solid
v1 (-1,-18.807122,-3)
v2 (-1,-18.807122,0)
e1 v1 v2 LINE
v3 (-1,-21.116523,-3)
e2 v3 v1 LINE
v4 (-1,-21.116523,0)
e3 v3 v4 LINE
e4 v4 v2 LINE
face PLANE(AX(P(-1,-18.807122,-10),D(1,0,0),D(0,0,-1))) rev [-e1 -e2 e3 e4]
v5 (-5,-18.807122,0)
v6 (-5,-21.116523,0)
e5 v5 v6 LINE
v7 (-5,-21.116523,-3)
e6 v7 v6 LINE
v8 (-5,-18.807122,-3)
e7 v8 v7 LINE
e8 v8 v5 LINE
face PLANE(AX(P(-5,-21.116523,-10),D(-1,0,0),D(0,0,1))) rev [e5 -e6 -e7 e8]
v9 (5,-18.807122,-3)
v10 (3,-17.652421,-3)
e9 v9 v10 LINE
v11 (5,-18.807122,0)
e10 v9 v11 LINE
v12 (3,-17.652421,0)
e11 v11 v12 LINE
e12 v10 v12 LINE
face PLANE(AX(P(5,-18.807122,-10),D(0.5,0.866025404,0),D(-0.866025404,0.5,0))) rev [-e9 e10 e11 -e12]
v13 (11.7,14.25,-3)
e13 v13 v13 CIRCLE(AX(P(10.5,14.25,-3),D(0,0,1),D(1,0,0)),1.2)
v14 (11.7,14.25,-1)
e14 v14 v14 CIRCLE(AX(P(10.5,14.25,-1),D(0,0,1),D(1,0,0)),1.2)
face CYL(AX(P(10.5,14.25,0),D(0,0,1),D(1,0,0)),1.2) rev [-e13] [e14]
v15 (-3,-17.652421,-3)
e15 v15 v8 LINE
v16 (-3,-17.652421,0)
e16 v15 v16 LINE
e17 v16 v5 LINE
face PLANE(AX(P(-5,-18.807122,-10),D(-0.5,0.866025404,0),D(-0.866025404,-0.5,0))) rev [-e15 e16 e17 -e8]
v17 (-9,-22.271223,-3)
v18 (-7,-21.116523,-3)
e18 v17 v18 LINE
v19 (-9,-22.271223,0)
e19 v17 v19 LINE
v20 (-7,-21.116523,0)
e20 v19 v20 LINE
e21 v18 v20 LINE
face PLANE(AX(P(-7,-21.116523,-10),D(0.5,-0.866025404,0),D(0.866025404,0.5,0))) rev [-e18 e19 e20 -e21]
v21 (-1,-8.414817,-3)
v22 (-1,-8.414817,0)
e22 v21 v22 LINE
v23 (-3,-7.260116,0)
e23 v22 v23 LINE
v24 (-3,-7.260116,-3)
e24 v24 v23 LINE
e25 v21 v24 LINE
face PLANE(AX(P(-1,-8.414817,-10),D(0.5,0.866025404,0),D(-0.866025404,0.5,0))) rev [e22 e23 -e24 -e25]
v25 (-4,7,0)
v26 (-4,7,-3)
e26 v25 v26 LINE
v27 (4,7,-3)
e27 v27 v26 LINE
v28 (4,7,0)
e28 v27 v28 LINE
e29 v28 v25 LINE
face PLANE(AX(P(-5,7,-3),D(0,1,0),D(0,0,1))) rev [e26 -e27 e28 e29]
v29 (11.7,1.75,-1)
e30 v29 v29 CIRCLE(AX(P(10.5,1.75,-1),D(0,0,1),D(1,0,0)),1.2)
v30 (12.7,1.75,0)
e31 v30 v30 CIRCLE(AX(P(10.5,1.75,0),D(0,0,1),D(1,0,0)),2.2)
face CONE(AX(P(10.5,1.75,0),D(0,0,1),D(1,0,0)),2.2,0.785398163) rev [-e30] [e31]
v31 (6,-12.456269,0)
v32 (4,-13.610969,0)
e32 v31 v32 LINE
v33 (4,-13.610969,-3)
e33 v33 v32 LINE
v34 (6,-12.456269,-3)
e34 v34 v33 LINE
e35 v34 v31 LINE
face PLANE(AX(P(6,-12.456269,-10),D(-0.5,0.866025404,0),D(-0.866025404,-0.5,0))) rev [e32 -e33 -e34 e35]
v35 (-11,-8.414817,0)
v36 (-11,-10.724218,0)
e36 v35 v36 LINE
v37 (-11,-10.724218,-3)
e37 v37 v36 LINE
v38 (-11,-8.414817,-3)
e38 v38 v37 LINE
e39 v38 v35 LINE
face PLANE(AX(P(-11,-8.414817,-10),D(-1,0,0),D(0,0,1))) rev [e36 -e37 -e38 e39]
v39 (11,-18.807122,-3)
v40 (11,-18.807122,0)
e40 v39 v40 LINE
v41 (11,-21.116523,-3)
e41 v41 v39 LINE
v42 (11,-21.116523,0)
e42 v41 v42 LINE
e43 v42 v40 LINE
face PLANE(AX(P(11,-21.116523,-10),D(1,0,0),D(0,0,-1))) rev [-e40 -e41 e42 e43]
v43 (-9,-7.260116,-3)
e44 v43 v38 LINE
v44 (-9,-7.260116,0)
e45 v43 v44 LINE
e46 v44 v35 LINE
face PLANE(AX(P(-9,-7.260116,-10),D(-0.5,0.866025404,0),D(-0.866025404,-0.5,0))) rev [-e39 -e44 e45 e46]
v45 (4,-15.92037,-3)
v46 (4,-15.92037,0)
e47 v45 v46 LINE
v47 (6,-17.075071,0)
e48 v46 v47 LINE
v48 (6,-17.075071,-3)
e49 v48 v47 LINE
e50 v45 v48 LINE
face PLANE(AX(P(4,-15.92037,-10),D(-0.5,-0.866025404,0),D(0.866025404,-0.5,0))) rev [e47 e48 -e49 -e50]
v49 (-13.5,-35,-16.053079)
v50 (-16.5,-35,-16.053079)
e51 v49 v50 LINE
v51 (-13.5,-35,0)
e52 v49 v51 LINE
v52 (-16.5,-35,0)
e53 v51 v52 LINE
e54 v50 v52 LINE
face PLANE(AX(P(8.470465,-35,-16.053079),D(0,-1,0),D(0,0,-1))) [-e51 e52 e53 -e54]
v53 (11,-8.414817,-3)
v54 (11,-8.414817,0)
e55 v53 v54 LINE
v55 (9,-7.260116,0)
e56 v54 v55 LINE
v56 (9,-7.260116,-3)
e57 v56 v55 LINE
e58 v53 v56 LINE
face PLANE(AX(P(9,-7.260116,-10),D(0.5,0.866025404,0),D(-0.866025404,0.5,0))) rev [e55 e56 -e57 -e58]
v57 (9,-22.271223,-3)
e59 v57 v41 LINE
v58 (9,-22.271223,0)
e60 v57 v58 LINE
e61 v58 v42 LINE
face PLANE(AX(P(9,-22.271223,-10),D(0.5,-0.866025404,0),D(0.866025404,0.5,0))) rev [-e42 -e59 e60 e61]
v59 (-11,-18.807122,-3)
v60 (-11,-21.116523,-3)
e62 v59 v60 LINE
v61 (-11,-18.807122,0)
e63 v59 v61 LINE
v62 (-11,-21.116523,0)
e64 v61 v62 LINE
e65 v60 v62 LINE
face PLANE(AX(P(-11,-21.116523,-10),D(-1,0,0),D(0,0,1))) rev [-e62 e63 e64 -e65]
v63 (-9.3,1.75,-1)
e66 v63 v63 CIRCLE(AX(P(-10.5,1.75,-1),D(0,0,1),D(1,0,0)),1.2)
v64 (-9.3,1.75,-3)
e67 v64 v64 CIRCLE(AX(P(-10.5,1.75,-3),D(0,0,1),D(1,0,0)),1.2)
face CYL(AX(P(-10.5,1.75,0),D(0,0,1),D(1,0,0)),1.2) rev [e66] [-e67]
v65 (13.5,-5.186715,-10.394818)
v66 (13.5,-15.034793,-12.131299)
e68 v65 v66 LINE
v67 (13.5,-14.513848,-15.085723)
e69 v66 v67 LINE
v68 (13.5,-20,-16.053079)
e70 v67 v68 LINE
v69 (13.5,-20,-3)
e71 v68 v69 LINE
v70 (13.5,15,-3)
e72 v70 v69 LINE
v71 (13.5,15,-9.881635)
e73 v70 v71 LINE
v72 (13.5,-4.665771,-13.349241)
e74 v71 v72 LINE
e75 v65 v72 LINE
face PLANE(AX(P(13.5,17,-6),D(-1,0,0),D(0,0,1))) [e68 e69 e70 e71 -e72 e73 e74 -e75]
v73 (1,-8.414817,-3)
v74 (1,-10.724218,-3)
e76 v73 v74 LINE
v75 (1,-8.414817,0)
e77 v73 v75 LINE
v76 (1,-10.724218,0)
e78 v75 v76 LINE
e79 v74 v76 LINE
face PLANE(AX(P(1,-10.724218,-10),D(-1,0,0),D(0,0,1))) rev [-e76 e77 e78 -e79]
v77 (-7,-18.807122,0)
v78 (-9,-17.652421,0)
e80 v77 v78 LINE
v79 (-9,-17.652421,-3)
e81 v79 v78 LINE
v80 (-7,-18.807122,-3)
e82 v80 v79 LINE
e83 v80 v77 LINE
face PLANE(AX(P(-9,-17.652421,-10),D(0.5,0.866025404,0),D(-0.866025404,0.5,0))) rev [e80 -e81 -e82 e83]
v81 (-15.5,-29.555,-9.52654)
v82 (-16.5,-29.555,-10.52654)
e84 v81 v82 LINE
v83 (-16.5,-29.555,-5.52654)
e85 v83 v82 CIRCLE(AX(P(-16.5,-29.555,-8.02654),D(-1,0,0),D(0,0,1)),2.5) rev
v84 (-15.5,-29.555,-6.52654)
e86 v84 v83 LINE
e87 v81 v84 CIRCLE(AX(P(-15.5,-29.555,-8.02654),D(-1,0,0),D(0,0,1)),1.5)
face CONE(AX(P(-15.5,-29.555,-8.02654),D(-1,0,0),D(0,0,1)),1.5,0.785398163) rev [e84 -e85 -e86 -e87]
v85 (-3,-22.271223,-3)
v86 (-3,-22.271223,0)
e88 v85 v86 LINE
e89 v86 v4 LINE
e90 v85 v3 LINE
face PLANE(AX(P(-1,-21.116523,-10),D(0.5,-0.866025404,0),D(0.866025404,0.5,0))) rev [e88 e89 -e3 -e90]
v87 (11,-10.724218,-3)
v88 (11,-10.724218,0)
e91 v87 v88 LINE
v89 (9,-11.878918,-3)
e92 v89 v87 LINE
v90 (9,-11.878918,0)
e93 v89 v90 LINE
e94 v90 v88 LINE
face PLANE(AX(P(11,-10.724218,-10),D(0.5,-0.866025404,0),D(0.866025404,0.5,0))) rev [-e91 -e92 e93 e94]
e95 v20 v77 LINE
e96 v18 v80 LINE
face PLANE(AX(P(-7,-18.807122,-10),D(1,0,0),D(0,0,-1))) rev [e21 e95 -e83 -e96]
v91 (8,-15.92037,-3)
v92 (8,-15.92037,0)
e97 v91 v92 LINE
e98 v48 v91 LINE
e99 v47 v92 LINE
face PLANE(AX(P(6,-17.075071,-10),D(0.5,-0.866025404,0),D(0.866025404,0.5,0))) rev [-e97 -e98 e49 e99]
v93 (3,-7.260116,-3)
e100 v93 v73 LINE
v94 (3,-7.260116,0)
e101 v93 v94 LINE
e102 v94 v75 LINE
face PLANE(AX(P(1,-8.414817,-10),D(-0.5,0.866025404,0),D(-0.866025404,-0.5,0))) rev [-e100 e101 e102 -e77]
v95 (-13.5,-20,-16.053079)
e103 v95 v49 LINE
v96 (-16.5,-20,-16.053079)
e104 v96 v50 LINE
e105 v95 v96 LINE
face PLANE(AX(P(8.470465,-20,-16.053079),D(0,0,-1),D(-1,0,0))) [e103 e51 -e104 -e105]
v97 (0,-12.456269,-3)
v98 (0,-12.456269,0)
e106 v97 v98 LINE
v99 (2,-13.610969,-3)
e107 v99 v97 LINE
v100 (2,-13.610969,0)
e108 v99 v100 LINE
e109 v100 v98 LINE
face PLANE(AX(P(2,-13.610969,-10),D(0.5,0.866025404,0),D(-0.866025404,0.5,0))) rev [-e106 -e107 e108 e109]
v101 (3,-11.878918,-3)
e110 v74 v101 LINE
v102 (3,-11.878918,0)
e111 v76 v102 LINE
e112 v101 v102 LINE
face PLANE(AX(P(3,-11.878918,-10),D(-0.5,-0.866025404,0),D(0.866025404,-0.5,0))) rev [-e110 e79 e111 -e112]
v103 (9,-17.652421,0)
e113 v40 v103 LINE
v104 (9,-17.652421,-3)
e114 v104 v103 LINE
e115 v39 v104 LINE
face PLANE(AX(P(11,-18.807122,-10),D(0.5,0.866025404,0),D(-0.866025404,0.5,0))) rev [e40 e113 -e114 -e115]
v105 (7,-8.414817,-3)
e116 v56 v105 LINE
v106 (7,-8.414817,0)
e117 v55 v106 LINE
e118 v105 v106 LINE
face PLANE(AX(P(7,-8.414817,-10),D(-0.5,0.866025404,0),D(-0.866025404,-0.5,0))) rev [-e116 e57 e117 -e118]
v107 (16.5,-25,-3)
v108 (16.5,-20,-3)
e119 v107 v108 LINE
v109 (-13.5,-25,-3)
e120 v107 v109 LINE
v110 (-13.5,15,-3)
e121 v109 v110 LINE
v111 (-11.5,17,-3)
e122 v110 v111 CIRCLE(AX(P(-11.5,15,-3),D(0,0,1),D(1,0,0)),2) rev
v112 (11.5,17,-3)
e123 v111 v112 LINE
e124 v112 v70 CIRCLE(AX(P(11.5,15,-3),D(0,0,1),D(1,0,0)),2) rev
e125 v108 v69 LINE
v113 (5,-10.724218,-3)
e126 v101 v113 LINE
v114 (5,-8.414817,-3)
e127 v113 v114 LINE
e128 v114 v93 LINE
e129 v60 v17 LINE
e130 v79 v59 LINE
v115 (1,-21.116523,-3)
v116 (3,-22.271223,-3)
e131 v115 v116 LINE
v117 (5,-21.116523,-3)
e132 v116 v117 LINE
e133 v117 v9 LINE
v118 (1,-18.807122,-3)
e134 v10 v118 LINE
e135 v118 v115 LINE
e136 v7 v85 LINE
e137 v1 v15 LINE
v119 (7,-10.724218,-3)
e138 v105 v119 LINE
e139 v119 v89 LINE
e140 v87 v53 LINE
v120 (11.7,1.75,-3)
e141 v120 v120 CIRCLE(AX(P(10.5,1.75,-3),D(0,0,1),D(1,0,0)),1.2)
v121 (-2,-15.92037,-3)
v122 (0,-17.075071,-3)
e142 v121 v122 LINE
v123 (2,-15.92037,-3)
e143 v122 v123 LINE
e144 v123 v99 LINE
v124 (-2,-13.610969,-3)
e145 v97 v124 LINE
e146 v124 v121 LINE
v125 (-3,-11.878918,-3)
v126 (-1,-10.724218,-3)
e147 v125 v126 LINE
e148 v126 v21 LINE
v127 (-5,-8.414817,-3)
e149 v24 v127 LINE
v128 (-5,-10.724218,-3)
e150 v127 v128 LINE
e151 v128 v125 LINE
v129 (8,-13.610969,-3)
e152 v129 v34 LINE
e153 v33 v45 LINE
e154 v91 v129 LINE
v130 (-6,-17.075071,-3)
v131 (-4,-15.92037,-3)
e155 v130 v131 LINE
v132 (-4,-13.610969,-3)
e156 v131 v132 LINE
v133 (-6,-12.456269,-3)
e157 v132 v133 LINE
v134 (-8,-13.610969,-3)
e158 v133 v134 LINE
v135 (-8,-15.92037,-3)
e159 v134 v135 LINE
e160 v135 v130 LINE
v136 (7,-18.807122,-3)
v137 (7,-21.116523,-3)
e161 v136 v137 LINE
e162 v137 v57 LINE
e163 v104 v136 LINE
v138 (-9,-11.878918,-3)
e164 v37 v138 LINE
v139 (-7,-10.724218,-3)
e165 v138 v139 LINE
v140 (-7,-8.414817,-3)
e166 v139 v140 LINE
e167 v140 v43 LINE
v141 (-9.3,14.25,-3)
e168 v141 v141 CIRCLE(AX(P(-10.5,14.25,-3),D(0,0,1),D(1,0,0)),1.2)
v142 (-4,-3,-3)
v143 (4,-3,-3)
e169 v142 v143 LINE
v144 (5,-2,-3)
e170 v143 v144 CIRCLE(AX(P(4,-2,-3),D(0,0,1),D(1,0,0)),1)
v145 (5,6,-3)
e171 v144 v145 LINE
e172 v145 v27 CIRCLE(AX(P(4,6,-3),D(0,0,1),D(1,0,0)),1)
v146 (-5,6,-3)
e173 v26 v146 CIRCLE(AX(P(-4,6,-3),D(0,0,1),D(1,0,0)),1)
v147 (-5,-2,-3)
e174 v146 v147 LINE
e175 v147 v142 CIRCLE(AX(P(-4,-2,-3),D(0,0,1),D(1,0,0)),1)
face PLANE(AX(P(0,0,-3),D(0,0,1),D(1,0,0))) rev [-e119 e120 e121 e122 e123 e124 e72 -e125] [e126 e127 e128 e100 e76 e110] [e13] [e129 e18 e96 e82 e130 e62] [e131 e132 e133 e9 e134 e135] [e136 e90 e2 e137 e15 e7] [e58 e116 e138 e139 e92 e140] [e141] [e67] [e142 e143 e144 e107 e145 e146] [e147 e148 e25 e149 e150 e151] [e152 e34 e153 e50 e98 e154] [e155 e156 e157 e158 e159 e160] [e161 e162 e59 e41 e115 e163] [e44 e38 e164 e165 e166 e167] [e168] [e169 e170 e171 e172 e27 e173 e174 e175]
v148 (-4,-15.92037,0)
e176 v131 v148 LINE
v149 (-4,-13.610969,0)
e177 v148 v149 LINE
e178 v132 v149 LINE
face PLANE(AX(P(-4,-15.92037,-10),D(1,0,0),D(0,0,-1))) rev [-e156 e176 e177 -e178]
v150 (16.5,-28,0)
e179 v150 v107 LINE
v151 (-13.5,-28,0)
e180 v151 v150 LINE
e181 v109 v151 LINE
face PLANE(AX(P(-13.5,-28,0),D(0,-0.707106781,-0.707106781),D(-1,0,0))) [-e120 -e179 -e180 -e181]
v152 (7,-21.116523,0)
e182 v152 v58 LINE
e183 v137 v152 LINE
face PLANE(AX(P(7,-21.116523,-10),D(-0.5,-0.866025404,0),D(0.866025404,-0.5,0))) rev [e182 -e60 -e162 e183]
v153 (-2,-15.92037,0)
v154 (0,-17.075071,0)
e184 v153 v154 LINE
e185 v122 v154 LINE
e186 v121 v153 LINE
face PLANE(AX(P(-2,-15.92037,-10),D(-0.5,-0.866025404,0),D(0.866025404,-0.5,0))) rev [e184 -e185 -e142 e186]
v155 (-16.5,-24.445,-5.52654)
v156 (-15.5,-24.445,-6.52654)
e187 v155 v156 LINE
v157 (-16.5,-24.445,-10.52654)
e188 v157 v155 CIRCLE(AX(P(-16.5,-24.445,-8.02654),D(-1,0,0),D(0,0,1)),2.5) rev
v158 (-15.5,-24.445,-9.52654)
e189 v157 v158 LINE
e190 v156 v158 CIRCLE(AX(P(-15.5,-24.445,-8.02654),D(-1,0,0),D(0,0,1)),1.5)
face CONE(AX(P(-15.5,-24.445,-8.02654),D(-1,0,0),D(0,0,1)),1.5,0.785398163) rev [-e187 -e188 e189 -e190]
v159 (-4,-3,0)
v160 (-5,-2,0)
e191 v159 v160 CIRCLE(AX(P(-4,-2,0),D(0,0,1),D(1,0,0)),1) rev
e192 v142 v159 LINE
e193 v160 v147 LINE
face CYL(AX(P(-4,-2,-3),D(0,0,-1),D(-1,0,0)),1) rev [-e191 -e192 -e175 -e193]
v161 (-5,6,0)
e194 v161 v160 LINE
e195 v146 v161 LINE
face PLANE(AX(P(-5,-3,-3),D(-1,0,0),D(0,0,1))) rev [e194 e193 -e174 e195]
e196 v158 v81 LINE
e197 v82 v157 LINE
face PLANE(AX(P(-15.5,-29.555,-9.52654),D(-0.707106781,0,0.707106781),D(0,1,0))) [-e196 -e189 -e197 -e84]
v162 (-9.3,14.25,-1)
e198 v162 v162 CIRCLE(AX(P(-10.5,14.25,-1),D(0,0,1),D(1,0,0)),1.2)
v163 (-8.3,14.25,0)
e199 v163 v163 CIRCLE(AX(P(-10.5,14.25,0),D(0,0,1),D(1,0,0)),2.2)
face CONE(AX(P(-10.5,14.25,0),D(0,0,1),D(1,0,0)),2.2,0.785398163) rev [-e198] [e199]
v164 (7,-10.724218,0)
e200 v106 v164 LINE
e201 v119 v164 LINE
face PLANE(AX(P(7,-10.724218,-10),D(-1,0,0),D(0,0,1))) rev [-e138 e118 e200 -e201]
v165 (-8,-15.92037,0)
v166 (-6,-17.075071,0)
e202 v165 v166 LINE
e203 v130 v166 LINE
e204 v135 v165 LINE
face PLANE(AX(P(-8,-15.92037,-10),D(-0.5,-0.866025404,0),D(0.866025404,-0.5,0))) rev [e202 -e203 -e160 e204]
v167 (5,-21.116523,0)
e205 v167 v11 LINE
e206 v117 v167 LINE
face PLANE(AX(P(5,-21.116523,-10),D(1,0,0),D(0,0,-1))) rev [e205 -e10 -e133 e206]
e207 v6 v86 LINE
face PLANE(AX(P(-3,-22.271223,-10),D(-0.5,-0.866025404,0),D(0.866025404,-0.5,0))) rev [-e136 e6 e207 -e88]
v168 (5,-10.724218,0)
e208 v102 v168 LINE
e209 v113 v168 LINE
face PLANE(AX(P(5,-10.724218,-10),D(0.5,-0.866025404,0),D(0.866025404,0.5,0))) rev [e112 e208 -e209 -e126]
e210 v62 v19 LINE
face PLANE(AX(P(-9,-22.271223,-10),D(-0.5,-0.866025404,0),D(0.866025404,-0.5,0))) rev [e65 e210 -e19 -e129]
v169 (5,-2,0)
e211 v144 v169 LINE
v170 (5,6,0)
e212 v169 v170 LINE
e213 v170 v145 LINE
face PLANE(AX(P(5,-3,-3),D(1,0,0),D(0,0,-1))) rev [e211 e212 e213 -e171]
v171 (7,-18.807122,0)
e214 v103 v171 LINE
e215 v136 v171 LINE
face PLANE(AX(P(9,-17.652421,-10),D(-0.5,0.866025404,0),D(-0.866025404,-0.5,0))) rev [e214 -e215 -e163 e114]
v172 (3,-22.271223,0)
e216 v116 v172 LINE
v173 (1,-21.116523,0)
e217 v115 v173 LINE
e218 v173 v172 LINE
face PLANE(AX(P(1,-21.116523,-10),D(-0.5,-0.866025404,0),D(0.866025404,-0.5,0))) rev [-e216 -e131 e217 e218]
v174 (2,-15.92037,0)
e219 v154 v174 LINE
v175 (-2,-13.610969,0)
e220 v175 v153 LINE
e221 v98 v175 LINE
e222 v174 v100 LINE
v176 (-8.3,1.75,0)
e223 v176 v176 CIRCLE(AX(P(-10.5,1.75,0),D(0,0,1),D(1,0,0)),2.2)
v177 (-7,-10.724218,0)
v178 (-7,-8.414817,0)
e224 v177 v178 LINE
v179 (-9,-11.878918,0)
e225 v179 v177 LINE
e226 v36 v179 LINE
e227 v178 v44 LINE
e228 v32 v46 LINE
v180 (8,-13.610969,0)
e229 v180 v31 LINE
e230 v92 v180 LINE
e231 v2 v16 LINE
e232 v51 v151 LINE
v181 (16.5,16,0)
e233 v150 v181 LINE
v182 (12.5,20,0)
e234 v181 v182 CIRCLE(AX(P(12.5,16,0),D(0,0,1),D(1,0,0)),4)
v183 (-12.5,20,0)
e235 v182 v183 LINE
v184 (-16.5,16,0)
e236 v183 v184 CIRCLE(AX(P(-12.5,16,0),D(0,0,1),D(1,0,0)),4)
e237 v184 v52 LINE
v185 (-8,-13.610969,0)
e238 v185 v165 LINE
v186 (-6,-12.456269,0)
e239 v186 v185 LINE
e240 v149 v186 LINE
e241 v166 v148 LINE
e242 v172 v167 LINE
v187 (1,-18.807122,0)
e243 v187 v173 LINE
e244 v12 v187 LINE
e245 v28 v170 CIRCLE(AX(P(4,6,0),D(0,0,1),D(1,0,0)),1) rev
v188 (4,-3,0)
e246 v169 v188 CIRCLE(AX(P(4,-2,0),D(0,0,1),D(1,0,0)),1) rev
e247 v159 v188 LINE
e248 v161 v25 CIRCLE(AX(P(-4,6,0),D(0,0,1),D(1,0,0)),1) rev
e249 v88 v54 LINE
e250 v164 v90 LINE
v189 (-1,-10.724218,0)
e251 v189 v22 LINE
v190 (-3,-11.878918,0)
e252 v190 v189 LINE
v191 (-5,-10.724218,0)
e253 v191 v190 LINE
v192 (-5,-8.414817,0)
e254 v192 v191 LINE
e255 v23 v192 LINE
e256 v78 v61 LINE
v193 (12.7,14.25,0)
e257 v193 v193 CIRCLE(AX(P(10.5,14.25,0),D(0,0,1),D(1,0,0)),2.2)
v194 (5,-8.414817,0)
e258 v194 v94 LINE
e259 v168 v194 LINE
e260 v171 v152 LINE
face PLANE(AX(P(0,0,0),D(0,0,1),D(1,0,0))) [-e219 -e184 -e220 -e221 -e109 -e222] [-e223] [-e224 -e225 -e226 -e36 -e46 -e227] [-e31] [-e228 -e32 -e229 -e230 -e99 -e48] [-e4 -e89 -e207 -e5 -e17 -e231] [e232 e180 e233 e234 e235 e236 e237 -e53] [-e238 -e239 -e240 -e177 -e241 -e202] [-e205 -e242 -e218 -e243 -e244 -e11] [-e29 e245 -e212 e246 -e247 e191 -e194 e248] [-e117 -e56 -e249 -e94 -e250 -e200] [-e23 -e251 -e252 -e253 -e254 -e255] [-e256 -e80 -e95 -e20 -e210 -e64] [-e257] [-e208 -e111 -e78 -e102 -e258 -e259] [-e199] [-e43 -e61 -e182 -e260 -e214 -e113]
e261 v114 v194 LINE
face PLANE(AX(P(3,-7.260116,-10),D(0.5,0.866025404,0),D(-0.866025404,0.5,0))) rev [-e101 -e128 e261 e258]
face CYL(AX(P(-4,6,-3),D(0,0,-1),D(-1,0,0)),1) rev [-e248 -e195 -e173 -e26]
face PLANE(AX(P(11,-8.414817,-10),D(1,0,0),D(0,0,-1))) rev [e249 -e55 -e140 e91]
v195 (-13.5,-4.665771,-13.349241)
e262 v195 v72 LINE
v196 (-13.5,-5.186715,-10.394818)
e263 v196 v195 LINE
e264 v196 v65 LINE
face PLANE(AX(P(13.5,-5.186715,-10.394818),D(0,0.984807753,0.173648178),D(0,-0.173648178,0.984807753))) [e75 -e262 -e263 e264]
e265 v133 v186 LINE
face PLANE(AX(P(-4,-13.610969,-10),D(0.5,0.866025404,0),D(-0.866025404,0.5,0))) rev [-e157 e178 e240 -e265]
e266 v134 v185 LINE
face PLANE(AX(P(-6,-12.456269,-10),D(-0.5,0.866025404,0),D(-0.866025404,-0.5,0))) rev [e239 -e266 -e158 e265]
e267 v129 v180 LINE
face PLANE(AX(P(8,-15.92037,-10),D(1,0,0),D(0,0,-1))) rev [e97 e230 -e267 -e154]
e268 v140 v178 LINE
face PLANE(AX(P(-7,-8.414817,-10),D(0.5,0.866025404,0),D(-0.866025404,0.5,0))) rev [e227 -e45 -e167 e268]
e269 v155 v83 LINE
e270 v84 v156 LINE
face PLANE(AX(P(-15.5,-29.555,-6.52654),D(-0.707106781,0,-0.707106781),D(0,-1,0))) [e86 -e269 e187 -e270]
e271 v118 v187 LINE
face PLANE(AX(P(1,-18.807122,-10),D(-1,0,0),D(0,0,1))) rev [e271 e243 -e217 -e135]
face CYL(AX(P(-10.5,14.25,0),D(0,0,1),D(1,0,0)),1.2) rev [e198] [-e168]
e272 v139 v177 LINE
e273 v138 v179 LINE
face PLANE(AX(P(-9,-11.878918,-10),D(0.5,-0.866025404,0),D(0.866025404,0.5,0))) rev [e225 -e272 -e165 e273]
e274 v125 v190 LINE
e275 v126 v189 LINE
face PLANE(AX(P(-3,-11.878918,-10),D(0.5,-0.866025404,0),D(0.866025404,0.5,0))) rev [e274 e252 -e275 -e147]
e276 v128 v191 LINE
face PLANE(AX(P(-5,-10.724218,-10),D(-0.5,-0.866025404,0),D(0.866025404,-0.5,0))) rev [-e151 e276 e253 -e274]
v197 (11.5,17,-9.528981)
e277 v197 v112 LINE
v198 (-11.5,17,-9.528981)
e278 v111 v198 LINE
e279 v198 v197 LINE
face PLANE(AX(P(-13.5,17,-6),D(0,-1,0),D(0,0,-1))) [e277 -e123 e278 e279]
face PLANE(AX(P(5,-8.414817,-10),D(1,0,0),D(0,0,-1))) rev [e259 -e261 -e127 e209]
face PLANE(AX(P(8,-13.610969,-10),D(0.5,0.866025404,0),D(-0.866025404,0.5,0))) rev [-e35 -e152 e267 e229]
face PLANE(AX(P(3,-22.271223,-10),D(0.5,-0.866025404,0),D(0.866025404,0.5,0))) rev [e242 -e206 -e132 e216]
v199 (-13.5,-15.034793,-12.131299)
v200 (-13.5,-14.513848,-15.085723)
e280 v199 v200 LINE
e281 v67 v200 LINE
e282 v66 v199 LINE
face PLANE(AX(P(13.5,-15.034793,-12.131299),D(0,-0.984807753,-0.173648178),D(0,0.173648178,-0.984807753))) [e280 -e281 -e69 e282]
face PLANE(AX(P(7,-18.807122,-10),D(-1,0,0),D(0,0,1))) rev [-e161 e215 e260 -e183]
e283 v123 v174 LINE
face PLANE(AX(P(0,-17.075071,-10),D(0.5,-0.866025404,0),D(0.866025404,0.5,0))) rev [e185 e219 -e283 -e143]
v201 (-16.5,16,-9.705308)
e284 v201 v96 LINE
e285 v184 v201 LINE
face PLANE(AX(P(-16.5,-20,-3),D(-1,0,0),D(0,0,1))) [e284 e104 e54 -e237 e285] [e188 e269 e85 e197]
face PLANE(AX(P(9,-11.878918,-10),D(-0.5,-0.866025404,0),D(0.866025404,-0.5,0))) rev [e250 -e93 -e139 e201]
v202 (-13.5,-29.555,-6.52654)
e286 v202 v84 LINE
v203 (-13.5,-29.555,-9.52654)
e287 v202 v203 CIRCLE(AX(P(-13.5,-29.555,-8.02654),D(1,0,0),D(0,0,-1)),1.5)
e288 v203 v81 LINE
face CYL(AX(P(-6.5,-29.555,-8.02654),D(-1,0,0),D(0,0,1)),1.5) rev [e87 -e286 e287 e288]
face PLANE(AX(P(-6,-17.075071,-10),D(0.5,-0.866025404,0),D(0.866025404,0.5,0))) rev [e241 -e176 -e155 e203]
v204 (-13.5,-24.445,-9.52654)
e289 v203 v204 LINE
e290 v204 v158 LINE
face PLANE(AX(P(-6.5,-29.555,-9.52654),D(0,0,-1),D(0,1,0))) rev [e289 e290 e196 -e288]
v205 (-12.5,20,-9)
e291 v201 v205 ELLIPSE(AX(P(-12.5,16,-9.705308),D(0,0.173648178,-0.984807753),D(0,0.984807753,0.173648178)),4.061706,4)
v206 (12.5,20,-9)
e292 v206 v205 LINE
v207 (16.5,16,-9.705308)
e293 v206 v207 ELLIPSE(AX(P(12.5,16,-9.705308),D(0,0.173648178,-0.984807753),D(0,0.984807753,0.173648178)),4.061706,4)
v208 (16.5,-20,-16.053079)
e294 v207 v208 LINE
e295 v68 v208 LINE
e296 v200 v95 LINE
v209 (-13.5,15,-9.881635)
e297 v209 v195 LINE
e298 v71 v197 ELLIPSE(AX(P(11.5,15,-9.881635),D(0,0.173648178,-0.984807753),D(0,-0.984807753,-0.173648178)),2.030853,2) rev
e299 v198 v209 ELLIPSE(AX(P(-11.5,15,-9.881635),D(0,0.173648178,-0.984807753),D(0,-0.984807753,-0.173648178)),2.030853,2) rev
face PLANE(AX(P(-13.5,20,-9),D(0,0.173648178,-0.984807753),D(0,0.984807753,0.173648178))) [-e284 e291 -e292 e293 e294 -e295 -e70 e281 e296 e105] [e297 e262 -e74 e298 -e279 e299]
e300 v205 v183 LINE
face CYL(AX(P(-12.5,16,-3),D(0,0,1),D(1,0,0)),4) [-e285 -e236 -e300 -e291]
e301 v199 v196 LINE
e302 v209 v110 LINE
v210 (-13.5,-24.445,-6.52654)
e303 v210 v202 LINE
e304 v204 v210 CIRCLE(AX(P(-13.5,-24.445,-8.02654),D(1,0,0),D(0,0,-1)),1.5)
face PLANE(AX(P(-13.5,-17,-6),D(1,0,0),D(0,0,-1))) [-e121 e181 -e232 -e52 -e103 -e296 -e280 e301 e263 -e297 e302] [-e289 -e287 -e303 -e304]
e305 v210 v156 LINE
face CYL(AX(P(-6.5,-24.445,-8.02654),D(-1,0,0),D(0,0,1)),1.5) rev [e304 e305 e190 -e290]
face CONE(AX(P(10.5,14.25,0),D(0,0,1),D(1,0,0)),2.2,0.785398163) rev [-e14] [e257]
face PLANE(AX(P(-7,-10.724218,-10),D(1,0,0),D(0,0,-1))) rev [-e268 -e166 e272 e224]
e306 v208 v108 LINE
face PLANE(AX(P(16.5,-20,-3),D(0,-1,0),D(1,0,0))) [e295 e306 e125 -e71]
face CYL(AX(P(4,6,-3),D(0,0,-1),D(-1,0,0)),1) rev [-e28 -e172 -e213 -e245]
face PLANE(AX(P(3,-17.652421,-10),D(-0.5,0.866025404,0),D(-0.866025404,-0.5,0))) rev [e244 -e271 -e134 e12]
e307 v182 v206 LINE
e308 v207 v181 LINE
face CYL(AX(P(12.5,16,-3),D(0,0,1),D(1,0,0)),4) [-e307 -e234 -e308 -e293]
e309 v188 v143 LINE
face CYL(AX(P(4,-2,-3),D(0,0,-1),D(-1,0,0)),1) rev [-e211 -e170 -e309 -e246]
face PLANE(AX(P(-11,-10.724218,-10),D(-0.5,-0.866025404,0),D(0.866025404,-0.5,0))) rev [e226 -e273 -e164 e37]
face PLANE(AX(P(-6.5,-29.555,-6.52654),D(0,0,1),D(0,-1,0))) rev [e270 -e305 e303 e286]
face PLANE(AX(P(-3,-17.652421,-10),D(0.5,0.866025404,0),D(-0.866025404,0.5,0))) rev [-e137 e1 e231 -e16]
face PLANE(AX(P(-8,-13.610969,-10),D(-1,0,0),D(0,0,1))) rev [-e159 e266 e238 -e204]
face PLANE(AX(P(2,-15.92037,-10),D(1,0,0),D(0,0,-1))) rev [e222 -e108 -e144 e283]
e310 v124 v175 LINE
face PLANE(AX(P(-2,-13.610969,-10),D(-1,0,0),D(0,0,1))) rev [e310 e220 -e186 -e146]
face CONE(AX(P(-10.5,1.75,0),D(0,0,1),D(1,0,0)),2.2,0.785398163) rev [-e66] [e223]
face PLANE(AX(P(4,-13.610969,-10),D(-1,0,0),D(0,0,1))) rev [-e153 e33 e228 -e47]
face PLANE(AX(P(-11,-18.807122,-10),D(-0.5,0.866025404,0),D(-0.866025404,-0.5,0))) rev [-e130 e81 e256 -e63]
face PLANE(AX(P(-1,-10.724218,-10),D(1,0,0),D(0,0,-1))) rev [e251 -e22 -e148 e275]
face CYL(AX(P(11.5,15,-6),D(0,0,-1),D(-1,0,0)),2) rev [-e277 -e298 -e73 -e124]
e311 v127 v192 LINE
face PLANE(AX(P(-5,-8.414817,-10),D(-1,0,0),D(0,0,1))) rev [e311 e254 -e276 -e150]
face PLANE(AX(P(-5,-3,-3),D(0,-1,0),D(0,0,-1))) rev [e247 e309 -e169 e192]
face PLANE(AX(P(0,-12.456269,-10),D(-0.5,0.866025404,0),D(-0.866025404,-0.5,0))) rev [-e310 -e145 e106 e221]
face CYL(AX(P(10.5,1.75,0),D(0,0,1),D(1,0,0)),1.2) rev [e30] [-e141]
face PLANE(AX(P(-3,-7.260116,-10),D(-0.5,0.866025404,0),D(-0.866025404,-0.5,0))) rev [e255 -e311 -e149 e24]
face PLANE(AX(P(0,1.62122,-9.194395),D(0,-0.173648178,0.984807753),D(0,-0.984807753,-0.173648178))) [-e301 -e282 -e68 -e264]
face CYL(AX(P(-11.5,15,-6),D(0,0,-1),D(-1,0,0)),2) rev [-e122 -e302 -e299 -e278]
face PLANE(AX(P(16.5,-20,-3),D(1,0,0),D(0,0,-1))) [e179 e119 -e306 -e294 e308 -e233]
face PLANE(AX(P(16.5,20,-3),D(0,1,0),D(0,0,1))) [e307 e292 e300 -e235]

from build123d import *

# Parameters (mm, degrees)
SKETCH1_W                                       = 33
SKETCH1_H                                       = 40
BOSS_EXTRUDE1_DEPTH                             = 3
SKETCH2_W                                       = 33
SKETCH2_H                                       = 40
SKETCH2_W_2                                     = 27
SKETCH2_H_2                                     = 34
BOSS_EXTRUDE2_DEPTH                             = 3
SKETCH3_W                                       = 10
SKETCH3_H                                       = 10
CUT_EXTRUDE1_DEPTH                              = 3
CSK_FOR_M2_FLAT_HEAD_MACHINE_SCREW1_D           = 2.4
CSK_FOR_M2_FLAT_HEAD_MACHINE_SCREW1_DEPTH       = 5
CSK_FOR_M2_FLAT_HEAD_MACHINE_SCREW1_CSINK_D     = 4.4
CSK_FOR_M2_FLAT_HEAD_MACHINE_SCREW1_CSINK_ANGLE = 90
CSK_FOR_M2_FLAT_HEAD_MACHINE_SCREW1_TIP         = 0.721032743
BOSS_EXTRUDE4_DEPTH                             = 3
FILLET1_R                                       = 1
BOSS_EXTRUDE5_REACH                             = 29.809
SKETCH15_W                                      = 27
SKETCH15_H                                      = 3
SKETCH16_W                                      = 27
SKETCH16_H                                      = 3
CUT_EXTRUDE6_DEPTH                              = 3
SKETCH18_W                                      = 27
SKETCH18_H                                      = 10
BOSS_EXTRUDE6_DEPTH                             = 3
FILLET2_R                                       = 4
FILLET3_R                                       = 2
SKETCH21_W                                      = 16.053079228
SKETCH21_H                                      = 15
BOSS_EXTRUDE7_DEPTH                             = 3
CUT_EXTRUDE10_DEPTH                             = 10
SKETCH23_W                                      = 30
SKETCH23_H                                      = 8
BOSS_EXTRUDE8_DEPTH                             = 3
CHAMFER5_SIZE                                   = 3
CHAMFER6_SIZE                                   = 1
CUT_EXTRUDE12_DEPTH                             = 10


with BuildPart() as part:
    # Sketch1 → Boss-Extrude1 (new body)
    with BuildSketch(Plane.XY):
        Rectangle(SKETCH1_W, SKETCH1_H)
    extrude(amount=-BOSS_EXTRUDE1_DEPTH)

    # Sketch2 → Boss-Extrude2 (add)
    with BuildSketch(Plane(origin=(0, 0, -3), x_dir=(-1, 0, 0), z_dir=(0, 0, -1))):
        Rectangle(SKETCH2_W, SKETCH2_H)
        Rectangle(SKETCH2_W_2, SKETCH2_H_2, mode=Mode.SUBTRACT)
    extrude(amount=BOSS_EXTRUDE2_DEPTH)

    # Sketch3 → Cut-Extrude1 (cut)
    with BuildSketch(Plane.XY):
        with Locations((0, 2)):
            Rectangle(SKETCH3_W, SKETCH3_H)
    extrude(amount=-CUT_EXTRUDE1_DEPTH, mode=Mode.SUBTRACT)

    # CSK for M2 Flat Head Machine Screw1
    with Locations(Plane.XY):
        with Locations((10.5, 1.75), (10.5, 14.25), (-10.5, 1.75), (-10.5, 14.25)):
            CounterSinkHole(CSK_FOR_M2_FLAT_HEAD_MACHINE_SCREW1_D / 2, CSK_FOR_M2_FLAT_HEAD_MACHINE_SCREW1_CSINK_D / 2, depth=CSK_FOR_M2_FLAT_HEAD_MACHINE_SCREW1_DEPTH, counter_sink_angle=CSK_FOR_M2_FLAT_HEAD_MACHINE_SCREW1_CSINK_ANGLE)
            with Locations((0, 0, -(CSK_FOR_M2_FLAT_HEAD_MACHINE_SCREW1_DEPTH + CSK_FOR_M2_FLAT_HEAD_MACHINE_SCREW1_TIP / 2))):  # 118° drill point
                Cone(0, CSK_FOR_M2_FLAT_HEAD_MACHINE_SCREW1_D / 2, CSK_FOR_M2_FLAT_HEAD_MACHINE_SCREW1_TIP, mode=Mode.SUBTRACT)

    # Sketch11 → Boss-Extrude4 (add)
    with BuildSketch(Plane.ZY.offset(16.5)):
        Polygon((-6, 20), (-9, 20), (-16.053079228, -20), (-6, -20), align=None)
    boss_extrude4 = extrude(amount=-BOSS_EXTRUDE4_DEPTH)

    # Mirror1: Boss-Extrude4 across plane
    add(boss_extrude4.mirror(Plane(origin=(0, 0, 0), x_dir=(0, 0, 1), z_dir=(1, 0, 0))))

    # Fillet1
    fillet1_edges = [part.edges().sort_by_distance(p)[0] for p in [
        (5, 7, -1.5),
        (5, -3, -1.5),
        (-5, -3, -1.5),
        (-5, 7, -1.5),
    ]]
    fillet(fillet1_edges, radius=FILLET1_R)

    # Boss-Extrude5: up to this face of the body (flat: up to its plane)
    boss_extrude5_end = Plane(part.part.faces().sort_by_distance((15, 0, -12.526539614))[0])
    # Sketch15 → Boss-Extrude5 (add, up to the picked face)
    with BuildSketch(Plane(origin=(0, 0, -6), x_dir=(-1, 0, 0), z_dir=(0, 0, -1)), mode=Mode.PRIVATE) as boss_extrude5_sk1:
        with Locations((0, 18.5)):
            Rectangle(SKETCH15_W, SKETCH15_H)
    boss_extrude5_tool1 = split(extrude(boss_extrude5_sk1.sketch, amount=BOSS_EXTRUDE5_REACH, mode=Mode.PRIVATE), bisect_by=boss_extrude5_end, keep=Keep.BOTH, mode=Mode.PRIVATE)
    add(boss_extrude5_tool1.solids().sort_by(Axis((0, 18.5, -6), (0, 0, -1)))[0])

    # Sketch16 → Cut-Extrude6 (cut)
    with BuildSketch(Plane.XZ.offset(20)):
        with Locations((0, -4.5)):
            Rectangle(SKETCH16_W, SKETCH16_H)
    extrude(amount=-CUT_EXTRUDE6_DEPTH, mode=Mode.SUBTRACT)

    # Sketch18 → Boss-Extrude6 (add)
    with BuildSketch(Plane(origin=(0, 2.142164437, -12.148818227), x_dir=(-1, 0, 0), z_dir=(0, 0.17364817766692342, -0.9848077530122092))):
        with Locations((0, -11.912958374)):
            Rectangle(SKETCH18_W, SKETCH18_H)
    extrude(amount=-BOSS_EXTRUDE6_DEPTH)

    # Fillet2
    fillet2_edges = [part.edges().sort_by_distance(p)[0] for p in [
        (-16.5, 20, -4.5),
        (16.5, 20, -4.5),
    ]]
    fillet(fillet2_edges, radius=FILLET2_R)

    # Fillet3
    fillet3_edges = [part.edges().sort_by_distance(p)[0] for p in [
        (-13.5, 17, -6.264490471),
        (13.5, 17, -6.264490471),
    ]]
    fillet(fillet3_edges, radius=FILLET3_R)

    # Sketch21 → Boss-Extrude7 (add)
    with BuildSketch(Plane.ZY.offset(16.5)):
        with Locations((-8.026539614, -27.5)):
            Rectangle(SKETCH21_W, SKETCH21_H)
    extrude(amount=-BOSS_EXTRUDE7_DEPTH)

    # Sketch22 → Cut-Extrude10 (cut)
    with BuildSketch(Plane.ZY.offset(16.5)):
        with BuildLine():
            Line((-9.526539614, -29.555), (-9.526539614, -24.445))
            ThreePointArc((-9.526539614, -24.445), (-8.026539614, -22.945), (-6.526539614, -24.445))
            Line((-6.526539614, -24.445), (-6.526539614, -29.555))
            ThreePointArc((-6.526539614, -29.555), (-8.026539614, -31.055), (-9.526539614, -29.555))
        make_face()
    extrude(amount=-CUT_EXTRUDE10_DEPTH, mode=Mode.SUBTRACT)

    # Sketch23 → Boss-Extrude8 (add)
    with BuildSketch(Plane.XY):
        with Locations((1.5, -24)):
            Rectangle(SKETCH23_W, SKETCH23_H)
    extrude(amount=-BOSS_EXTRUDE8_DEPTH)

    # Chamfer5
    chamfer5_edges = [part.edges().sort_by_distance(p)[0] for p in [
        (1.5, -28, -3),
    ]]
    chamfer(chamfer5_edges, length=CHAMFER5_SIZE - 0.0001)  # a hair under: the kernel refuses the full size

    # Chamfer6
    chamfer6_edges = [part.edges().sort_by_distance(p)[0] for p in [
        (-16.5, -31.055, -8.026539614),
        (-16.5, -27, -6.526539614),
        (-16.5, -22.945, -8.026539614),
        (-16.5, -27, -9.526539614),
    ]]
    chamfer(chamfer6_edges, length=CHAMFER6_SIZE)

    # Sketch25 → Cut-Extrude12 (cut)
    with BuildSketch(Plane.XY):
        Polygon((-1, -8.414816681), (-3, -7.260116142), (-5, -8.414816681), (-5, -10.724217758), (-3, -11.878918296), (-1, -10.724217758), align=None)
        Polygon((-7, -8.414816681), (-9, -7.260116142), (-11, -8.414816681), (-11, -10.724217758), (-9, -11.878918296), (-7, -10.724217758), align=None)
        Polygon((1, -10.724217758), (1, -8.414816681), (3, -7.260116142), (5, -8.414816681), (5, -10.724217758), (3, -11.878918296), align=None)
        Polygon((7, -10.724217758), (7, -8.414816681), (9, -7.260116142), (11, -8.414816681), (11, -10.724217758), (9, -11.878918296), align=None)
        Polygon((0, -12.456268565), (-2, -13.610969104), (-2, -15.92037018), (0, -17.075070719), (2, -15.92037018), (2, -13.610969104), align=None)
        Polygon((-6, -12.456268565), (-8, -13.610969104), (-8, -15.92037018), (-6, -17.075070719), (-4, -15.92037018), (-4, -13.610969104), align=None)
        Polygon((6, -12.456268565), (4, -13.610969104), (4, -15.92037018), (6, -17.075070719), (8, -15.92037018), (8, -13.610969104), align=None)
        Polygon((1, -21.116522603), (3, -22.271223141), (5, -21.116522603), (5, -18.807121526), (3, -17.652420988), (1, -18.807121526), align=None)
        Polygon((7, -21.116522603), (9, -22.271223141), (11, -21.116522603), (11, -18.807121526), (9, -17.652420988), (7, -18.807121526), align=None)
        Polygon((-1, -18.807121526), (-1, -21.116522603), (-3, -22.271223141), (-5, -21.116522603), (-5, -18.807121526), (-3, -17.652420988), align=None)
        Polygon((-7, -18.807121526), (-7, -21.116522603), (-9, -22.271223141), (-11, -21.116522603), (-11, -18.807121526), (-9, -17.652420988), align=None)
    extrude(amount=-CUT_EXTRUDE12_DEPTH, mode=Mode.SUBTRACT)


solid = part.part
